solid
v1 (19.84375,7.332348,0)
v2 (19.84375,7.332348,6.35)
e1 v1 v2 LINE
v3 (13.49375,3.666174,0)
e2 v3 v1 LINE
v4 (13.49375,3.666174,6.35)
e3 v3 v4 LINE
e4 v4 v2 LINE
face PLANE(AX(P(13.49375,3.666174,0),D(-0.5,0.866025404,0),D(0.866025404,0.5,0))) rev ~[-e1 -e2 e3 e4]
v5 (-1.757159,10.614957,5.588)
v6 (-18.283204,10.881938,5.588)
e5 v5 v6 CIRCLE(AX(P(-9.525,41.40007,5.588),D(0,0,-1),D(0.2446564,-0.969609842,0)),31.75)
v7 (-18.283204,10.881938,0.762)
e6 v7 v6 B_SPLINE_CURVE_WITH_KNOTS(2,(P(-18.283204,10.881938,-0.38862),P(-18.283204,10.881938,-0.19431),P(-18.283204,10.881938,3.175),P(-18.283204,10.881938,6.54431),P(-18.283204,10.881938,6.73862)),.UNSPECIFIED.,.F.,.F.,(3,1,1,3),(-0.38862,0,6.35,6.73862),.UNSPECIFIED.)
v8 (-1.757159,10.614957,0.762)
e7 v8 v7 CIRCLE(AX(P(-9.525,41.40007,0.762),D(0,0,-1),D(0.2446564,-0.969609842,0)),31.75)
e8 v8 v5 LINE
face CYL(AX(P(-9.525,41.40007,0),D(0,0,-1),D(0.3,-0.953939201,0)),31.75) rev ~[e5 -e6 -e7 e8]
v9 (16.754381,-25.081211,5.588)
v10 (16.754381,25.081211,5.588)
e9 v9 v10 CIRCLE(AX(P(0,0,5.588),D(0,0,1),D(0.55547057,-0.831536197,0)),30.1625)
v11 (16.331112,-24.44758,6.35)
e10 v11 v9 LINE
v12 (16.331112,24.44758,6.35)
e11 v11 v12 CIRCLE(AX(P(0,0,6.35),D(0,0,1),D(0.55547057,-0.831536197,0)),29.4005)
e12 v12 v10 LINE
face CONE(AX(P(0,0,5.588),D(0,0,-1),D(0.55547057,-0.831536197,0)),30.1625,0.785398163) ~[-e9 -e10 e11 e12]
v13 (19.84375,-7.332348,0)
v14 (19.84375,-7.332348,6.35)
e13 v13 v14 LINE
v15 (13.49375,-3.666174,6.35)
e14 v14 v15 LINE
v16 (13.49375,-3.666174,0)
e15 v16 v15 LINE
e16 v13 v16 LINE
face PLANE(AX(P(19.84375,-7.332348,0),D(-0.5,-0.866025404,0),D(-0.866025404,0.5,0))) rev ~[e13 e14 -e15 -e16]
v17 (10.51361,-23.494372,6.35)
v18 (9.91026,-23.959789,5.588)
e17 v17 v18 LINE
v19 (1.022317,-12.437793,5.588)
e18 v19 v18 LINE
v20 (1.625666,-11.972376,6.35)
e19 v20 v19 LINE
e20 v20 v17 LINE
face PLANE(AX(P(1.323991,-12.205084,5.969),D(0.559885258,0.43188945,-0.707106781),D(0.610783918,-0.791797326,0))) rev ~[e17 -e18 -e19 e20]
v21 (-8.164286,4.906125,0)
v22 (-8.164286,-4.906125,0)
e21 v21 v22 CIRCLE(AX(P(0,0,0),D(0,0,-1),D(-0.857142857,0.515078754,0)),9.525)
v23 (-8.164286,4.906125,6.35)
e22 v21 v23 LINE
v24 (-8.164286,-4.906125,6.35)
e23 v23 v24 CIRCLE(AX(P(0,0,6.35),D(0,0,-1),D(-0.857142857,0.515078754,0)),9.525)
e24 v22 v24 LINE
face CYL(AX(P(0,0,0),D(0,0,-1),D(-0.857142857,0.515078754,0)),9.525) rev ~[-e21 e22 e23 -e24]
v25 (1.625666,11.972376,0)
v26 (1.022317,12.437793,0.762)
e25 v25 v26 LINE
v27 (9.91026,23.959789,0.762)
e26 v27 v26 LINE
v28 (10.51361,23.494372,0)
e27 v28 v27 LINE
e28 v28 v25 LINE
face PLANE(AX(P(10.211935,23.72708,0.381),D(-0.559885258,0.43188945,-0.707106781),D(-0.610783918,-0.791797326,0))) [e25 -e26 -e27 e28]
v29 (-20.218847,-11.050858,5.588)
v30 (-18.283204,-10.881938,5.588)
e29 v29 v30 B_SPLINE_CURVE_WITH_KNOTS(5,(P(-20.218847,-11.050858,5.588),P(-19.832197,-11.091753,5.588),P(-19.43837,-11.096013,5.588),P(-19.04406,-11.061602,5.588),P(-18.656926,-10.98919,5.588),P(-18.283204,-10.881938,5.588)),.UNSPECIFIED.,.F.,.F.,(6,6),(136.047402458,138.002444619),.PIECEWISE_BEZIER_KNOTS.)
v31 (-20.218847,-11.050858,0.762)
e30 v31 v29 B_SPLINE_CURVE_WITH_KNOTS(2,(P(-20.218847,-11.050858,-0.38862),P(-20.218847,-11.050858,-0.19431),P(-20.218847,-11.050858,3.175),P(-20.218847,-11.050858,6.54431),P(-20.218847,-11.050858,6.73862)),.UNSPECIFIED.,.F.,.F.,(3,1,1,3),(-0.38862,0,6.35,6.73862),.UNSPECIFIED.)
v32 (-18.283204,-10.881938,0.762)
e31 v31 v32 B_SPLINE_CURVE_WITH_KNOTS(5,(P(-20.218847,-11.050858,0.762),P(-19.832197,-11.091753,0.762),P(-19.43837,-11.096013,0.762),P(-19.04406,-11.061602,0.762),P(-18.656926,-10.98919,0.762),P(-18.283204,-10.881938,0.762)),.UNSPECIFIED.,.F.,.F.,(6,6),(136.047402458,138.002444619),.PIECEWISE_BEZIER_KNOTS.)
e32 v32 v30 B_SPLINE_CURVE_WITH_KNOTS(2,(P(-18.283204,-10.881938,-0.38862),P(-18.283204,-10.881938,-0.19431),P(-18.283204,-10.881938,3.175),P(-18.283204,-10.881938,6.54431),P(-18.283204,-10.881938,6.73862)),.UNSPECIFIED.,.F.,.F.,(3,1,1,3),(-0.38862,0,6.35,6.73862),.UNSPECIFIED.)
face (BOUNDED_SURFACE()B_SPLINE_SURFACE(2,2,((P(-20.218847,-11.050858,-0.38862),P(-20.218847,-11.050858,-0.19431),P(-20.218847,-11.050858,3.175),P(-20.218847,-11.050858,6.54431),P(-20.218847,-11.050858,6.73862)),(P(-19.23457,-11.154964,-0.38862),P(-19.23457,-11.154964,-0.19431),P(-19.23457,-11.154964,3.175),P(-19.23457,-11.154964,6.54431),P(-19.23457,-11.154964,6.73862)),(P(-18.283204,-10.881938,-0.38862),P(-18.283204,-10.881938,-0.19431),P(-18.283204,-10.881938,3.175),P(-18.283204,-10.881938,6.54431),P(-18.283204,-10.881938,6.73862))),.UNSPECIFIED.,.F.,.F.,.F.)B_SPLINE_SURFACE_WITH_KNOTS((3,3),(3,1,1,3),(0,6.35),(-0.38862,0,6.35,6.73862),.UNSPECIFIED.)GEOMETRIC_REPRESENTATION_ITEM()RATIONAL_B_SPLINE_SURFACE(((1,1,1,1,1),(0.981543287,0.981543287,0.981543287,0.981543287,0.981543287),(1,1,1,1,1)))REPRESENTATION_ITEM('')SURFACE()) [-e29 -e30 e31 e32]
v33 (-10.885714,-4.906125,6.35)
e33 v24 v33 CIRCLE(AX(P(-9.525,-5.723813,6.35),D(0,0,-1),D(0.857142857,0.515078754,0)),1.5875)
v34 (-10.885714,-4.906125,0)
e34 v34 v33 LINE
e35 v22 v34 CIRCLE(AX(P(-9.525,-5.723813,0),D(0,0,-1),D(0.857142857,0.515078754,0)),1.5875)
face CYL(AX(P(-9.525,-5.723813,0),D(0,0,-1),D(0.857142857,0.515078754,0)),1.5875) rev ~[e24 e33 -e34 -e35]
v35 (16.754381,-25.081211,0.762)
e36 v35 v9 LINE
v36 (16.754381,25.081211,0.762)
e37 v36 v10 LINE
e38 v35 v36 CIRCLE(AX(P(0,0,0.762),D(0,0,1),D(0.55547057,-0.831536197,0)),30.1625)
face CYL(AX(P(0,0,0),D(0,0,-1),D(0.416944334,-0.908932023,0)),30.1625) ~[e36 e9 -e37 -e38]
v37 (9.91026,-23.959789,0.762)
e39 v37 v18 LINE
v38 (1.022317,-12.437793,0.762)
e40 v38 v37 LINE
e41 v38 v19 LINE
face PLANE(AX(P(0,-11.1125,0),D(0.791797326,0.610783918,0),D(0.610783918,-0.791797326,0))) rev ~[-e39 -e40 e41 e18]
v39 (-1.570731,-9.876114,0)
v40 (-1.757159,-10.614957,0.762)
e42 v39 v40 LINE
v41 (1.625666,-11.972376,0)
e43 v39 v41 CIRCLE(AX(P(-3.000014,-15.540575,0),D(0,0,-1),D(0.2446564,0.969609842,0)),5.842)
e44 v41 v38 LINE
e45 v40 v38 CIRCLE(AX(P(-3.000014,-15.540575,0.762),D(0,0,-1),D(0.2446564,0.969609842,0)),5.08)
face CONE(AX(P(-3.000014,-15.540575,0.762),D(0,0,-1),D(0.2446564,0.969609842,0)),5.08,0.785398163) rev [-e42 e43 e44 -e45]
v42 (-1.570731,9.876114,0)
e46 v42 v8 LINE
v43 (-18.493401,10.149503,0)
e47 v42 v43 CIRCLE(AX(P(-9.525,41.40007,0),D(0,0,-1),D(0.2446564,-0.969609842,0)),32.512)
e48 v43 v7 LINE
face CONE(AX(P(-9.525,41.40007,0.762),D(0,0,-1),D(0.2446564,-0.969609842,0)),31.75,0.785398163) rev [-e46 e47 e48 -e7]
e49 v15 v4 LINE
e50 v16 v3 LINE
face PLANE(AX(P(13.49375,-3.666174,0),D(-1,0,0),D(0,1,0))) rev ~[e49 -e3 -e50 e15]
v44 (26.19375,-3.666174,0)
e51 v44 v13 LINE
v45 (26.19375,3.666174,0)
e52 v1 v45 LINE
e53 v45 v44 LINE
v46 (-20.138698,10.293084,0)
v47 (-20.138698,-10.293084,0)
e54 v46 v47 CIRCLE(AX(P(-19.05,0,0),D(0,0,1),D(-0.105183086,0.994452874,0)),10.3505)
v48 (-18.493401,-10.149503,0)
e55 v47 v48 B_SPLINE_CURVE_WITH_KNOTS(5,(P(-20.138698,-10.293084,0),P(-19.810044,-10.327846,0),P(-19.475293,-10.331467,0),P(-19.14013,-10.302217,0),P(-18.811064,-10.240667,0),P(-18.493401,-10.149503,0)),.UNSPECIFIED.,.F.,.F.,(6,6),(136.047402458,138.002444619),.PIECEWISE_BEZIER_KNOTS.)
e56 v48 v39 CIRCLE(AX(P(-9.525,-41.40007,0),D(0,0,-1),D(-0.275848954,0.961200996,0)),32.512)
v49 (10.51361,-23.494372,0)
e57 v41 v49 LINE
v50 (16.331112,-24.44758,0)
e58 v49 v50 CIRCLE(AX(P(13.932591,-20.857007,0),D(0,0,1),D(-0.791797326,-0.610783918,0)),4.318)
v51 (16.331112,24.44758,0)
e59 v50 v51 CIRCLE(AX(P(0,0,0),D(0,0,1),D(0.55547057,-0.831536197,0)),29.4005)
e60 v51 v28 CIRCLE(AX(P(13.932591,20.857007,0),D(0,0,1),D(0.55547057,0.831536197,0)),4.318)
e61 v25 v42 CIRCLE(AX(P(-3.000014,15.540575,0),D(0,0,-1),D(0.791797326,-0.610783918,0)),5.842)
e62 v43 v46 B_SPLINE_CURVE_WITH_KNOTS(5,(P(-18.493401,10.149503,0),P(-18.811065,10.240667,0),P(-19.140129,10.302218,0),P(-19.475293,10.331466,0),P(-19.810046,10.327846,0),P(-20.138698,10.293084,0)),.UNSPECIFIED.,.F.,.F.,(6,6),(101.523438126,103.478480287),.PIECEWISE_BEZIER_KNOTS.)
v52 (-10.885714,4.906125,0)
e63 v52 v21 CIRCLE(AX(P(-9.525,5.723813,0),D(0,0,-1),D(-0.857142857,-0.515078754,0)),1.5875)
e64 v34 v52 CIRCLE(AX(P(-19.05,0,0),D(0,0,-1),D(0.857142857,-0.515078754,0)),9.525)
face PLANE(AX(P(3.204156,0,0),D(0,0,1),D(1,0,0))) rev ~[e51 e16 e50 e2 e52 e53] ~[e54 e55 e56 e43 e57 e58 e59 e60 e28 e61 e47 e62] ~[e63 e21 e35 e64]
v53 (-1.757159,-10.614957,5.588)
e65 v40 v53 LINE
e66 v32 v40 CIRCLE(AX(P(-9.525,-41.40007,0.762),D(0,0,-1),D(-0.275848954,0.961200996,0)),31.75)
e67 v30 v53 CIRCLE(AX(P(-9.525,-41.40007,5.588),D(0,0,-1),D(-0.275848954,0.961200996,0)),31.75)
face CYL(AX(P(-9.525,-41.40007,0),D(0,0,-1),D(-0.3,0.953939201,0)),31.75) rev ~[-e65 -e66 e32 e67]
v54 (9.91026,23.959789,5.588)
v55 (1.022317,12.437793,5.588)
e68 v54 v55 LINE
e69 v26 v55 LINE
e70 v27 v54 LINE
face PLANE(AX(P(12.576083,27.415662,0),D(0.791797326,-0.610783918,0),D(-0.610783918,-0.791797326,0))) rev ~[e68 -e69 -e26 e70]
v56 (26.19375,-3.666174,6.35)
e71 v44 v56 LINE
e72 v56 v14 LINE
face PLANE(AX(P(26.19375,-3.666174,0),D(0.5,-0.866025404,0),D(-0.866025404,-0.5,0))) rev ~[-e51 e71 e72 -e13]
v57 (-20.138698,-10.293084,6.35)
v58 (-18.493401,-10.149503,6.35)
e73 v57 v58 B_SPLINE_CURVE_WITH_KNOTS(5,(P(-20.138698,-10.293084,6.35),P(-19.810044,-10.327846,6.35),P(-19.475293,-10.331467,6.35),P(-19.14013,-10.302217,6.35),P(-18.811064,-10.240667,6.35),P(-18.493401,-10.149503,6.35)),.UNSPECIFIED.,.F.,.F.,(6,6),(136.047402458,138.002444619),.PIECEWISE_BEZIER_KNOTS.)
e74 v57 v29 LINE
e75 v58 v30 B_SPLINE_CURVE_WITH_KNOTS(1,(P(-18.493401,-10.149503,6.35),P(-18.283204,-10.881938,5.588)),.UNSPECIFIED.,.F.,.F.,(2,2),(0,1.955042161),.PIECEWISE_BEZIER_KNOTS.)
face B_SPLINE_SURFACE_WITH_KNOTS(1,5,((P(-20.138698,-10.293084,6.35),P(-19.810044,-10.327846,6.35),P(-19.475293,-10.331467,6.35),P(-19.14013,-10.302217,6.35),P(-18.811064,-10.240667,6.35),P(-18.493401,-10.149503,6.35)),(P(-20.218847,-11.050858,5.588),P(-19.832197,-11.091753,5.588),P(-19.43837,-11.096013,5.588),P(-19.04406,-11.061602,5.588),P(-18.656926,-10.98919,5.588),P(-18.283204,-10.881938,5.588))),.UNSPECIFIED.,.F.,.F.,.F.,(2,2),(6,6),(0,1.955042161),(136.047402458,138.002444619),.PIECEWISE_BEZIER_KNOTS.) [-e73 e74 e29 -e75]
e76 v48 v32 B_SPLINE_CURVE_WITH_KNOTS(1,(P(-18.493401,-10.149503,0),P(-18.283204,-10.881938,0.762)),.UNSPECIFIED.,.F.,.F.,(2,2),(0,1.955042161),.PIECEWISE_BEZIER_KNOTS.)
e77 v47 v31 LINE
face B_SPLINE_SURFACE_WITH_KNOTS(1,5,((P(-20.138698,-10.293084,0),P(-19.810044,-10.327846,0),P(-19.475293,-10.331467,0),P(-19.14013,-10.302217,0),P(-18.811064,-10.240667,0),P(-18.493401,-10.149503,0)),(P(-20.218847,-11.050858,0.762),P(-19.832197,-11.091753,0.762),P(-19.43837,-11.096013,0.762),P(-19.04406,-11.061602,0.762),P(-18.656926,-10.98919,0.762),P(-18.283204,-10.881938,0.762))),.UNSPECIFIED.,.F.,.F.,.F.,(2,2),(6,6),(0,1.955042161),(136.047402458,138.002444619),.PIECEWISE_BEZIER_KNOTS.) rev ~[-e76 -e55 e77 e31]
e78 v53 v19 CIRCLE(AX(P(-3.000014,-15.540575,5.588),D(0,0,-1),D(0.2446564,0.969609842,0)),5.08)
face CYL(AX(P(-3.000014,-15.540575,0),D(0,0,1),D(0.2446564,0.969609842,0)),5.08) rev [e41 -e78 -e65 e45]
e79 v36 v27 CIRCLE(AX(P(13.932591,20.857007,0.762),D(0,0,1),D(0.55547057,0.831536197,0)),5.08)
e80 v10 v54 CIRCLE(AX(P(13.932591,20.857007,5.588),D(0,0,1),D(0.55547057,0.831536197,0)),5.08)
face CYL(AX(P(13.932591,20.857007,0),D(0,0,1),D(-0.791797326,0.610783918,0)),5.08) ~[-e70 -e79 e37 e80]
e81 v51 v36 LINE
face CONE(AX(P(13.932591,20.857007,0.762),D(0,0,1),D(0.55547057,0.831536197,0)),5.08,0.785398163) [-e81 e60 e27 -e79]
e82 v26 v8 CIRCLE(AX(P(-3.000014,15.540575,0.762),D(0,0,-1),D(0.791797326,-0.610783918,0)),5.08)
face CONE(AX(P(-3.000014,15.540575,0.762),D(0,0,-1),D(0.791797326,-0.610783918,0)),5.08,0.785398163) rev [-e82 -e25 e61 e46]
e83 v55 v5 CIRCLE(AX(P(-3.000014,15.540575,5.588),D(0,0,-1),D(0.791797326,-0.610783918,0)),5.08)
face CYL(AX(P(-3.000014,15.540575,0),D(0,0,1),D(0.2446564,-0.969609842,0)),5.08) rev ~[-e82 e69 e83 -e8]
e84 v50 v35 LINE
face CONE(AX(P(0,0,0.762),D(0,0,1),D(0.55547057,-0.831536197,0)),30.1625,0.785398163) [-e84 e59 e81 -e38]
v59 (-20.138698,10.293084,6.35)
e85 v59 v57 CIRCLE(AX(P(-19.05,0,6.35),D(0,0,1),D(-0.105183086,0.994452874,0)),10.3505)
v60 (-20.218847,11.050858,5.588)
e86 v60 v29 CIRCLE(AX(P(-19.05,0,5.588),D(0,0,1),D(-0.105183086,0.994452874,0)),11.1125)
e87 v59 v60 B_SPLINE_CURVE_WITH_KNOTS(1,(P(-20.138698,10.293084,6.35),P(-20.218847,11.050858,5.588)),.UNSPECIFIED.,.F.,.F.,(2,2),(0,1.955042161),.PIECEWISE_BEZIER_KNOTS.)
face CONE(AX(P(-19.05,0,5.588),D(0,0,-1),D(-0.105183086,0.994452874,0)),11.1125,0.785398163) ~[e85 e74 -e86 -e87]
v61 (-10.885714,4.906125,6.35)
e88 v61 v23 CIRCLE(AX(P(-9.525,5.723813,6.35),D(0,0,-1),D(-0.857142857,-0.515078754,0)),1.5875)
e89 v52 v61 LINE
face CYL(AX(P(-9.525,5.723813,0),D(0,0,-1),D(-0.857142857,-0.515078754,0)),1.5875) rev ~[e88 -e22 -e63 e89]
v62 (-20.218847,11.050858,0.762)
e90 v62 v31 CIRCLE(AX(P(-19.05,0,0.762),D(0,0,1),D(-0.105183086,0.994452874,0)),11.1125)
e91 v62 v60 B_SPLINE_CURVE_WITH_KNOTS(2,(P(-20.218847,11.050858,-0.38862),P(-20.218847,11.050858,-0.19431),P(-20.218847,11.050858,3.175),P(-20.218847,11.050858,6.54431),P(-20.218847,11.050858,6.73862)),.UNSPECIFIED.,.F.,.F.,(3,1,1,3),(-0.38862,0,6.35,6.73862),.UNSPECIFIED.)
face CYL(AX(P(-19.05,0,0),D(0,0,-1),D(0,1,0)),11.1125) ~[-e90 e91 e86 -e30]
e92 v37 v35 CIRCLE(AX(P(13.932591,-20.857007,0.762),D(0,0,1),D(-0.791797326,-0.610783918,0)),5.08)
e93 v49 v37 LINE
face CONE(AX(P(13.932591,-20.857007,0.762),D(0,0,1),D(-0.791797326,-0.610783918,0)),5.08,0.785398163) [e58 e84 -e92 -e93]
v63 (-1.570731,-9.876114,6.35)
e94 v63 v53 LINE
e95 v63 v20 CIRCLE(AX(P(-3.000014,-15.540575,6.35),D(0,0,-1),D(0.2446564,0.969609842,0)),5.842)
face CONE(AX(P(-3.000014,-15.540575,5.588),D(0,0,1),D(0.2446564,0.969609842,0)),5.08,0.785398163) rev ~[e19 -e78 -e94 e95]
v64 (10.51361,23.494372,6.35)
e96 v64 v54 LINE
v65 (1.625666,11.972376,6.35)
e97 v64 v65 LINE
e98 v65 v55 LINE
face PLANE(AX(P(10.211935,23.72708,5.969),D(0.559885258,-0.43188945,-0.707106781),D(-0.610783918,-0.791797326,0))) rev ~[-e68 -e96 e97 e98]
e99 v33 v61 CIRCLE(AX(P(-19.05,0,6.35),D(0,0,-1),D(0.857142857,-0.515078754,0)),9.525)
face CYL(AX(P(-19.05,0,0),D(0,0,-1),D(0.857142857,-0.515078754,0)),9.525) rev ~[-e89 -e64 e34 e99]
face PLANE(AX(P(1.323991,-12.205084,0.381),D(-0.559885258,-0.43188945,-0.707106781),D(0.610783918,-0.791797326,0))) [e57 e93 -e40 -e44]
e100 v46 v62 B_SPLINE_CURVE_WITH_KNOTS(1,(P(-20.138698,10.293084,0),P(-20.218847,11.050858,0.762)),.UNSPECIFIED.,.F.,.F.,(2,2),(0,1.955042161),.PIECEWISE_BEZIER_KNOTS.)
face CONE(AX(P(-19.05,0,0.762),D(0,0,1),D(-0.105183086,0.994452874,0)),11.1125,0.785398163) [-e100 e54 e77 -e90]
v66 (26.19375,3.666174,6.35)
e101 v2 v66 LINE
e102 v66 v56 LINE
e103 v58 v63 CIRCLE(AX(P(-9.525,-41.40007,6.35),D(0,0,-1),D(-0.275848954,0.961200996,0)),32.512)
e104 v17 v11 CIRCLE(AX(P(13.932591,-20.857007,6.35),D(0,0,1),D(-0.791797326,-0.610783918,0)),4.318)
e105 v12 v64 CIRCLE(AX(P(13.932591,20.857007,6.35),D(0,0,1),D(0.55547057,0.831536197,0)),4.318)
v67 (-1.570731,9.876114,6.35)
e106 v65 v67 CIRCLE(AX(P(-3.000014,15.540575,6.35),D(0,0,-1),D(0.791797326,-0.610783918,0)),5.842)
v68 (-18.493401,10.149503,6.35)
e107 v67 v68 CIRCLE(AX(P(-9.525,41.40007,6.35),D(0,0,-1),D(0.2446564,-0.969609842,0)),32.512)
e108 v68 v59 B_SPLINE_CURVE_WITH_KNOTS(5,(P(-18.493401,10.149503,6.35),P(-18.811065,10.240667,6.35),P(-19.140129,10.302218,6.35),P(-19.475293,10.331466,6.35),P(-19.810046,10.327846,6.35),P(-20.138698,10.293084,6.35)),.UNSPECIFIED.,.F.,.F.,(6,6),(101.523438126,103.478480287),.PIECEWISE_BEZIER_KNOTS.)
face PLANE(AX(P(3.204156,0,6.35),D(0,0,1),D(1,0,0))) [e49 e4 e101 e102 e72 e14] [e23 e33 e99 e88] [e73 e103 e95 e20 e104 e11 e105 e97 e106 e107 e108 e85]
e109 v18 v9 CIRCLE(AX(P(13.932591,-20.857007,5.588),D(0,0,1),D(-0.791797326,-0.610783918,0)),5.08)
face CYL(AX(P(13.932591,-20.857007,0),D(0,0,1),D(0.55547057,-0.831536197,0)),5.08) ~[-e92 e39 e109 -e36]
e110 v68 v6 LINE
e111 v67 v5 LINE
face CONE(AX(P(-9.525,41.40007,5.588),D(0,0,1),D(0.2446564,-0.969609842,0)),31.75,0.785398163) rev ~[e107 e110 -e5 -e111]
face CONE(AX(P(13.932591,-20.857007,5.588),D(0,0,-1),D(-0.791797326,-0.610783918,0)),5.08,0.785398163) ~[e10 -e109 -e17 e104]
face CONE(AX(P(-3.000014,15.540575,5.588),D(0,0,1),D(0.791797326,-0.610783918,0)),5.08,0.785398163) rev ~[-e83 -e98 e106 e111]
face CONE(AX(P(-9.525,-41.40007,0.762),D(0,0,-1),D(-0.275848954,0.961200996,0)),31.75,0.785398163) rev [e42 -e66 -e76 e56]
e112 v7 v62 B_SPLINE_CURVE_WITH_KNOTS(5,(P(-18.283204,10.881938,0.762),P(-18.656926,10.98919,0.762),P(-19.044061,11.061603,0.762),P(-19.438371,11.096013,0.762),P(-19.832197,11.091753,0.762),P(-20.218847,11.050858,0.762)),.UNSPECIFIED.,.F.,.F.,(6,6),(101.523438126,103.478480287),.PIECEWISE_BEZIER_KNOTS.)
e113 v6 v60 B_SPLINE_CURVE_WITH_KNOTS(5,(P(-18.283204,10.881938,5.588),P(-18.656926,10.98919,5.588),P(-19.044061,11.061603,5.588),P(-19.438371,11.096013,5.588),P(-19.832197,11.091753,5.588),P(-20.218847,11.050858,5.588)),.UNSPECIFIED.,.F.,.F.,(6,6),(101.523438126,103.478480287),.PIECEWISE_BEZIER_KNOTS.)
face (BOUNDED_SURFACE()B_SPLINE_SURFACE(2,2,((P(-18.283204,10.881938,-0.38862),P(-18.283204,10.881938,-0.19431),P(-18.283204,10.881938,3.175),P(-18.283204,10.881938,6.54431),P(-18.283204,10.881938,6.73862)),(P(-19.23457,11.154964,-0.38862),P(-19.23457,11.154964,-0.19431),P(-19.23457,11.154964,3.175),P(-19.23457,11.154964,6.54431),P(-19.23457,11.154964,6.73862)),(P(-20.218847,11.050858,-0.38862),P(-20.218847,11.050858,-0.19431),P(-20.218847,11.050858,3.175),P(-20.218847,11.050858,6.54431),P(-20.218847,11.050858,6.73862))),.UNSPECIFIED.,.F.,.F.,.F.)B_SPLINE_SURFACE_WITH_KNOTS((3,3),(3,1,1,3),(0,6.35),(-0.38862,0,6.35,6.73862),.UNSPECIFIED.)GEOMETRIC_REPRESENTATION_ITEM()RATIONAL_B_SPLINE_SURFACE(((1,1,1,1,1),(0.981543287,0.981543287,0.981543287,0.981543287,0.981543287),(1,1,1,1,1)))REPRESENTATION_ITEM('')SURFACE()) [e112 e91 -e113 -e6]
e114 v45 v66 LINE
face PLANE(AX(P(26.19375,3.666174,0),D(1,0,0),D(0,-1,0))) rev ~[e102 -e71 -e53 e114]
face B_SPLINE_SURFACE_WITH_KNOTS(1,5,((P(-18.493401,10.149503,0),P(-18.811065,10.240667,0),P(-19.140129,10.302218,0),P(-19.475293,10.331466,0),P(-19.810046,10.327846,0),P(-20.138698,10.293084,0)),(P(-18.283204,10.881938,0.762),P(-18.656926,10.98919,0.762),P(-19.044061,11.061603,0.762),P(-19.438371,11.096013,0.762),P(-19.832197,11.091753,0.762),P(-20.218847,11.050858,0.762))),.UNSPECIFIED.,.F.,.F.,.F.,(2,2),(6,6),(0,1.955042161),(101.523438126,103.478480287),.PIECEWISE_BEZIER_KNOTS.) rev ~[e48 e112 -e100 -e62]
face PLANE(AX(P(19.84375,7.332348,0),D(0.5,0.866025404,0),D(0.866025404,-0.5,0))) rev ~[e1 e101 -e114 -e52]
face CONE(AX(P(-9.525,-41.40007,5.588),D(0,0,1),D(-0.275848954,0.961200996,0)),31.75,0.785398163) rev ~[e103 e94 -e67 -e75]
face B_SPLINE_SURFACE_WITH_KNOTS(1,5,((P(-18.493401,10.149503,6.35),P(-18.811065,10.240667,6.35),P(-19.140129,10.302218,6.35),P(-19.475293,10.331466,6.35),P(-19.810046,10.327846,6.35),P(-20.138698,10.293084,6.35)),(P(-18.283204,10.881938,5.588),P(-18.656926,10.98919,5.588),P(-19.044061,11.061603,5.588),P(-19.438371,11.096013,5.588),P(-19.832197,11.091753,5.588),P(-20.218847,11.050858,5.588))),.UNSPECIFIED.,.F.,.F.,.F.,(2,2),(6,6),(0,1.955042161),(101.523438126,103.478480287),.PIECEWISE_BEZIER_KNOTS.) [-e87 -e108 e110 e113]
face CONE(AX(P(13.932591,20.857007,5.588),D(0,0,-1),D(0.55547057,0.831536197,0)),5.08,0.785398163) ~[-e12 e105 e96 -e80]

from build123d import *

# Parameters (mm, degrees)
F1_DEPTH = 6.35
F2_R     = 5.08
F3_SIZE  = 0.762


with BuildPart() as f1:
    # F0 (on Top) → F1 (new body)
    with BuildSketch(Plane.XY):
        with BuildLine():
            ThreePointArc((0, 11.1125), (-9.525, 9.650069645), (-19.05, 11.1125))
            ThreePointArc((-19.05, 11.1125), (-30.1625, 0), (-19.05, -11.1125))
            ThreePointArc((-19.05, -11.1125), (-9.525, -9.650069645), (0, -11.1125))
            Line((0, -11.1125), (12.5760834642, -27.4156621469))
            ThreePointArc((12.5760834642, -27.4156621469), (30.1625, 0), (12.5760834642, 27.4156621469))
            Line((12.5760834642, 27.4156621469), (0, 11.1125))
        make_face()
        Polygon((19.84375, -7.3323484187), (13.49375, -3.6661742094), (13.49375, 3.6661742094), (19.84375, 7.3323484187), (26.19375, 3.6661742094), (26.19375, -3.6661742094), align=None, mode=Mode.SUBTRACT)
        with BuildLine():
            ThreePointArc((-8.1642857143, 4.9061251284), (9.525, 0), (-8.1642857143, -4.9061251284))
            ThreePointArc((-8.1642857143, -4.9061251284), (-9.525, -7.3113126498), (-10.8857142857, -4.9061251284))
            ThreePointArc((-10.8857142857, -4.9061251284), (-28.575, 0), (-10.8857142857, 4.9061251284))
            ThreePointArc((-10.8857142857, 4.9061251284), (-9.525, 7.3113126498), (-8.1642857143, 4.9061251284))
        make_face(mode=Mode.SUBTRACT)
    extrude(amount=F1_DEPTH)

    # F2
    f2_edges = [f1.edges().sort_by_distance(p)[0] for p in [
        (12.576083, 27.415662, 3.175),
        (0, 11.1125, 3.175),
        (-19.05, 11.1125, 3.175),
        (-19.05, -11.1125, 3.175),
        (0, -11.1125, 3.175),
        (12.576083, -27.415662, 3.175),
    ]]
    fillet(f2_edges, radius=F2_R)

    # F3
    f3_edges = [f1.edges().sort_by_distance(p)[0] for p in [
        (30.1625, 0, 6.35),
        (30.1625, 0, 0),
        (5.466288, 18.198791, 0),
        (5.466288, 18.198791, 6.35),
        (13.111177, 25.870157, 0),
        (-0.214116, 11.292614, 0),
        (-10.037859, 9.654212, 0),
        (13.111177, -25.870157, 0),
        (-19.242874, 11.059803, 0),
        (5.466288, -18.198791, 0),
        (-30.1625, 0, 0),
        (-0.214116, -11.292614, 0),
        (-19.242874, -11.059803, 0),
        (-10.037859, -9.654212, 0),
        (13.111177, 25.870157, 6.35),
        (-0.214116, 11.292614, 6.35),
        (-10.037859, 9.654212, 6.35),
        (13.111177, -25.870157, 6.35),
        (-19.242874, 11.059803, 6.35),
        (5.466288, -18.198791, 6.35),
        (-30.1625, 0, 6.35),
        (-0.214116, -11.292614, 6.35),
        (-19.242874, -11.059803, 6.35),
        (-10.037859, -9.654212, 6.35),
    ]]
    chamfer(f3_edges, length=F3_SIZE)


solid = f1.part
